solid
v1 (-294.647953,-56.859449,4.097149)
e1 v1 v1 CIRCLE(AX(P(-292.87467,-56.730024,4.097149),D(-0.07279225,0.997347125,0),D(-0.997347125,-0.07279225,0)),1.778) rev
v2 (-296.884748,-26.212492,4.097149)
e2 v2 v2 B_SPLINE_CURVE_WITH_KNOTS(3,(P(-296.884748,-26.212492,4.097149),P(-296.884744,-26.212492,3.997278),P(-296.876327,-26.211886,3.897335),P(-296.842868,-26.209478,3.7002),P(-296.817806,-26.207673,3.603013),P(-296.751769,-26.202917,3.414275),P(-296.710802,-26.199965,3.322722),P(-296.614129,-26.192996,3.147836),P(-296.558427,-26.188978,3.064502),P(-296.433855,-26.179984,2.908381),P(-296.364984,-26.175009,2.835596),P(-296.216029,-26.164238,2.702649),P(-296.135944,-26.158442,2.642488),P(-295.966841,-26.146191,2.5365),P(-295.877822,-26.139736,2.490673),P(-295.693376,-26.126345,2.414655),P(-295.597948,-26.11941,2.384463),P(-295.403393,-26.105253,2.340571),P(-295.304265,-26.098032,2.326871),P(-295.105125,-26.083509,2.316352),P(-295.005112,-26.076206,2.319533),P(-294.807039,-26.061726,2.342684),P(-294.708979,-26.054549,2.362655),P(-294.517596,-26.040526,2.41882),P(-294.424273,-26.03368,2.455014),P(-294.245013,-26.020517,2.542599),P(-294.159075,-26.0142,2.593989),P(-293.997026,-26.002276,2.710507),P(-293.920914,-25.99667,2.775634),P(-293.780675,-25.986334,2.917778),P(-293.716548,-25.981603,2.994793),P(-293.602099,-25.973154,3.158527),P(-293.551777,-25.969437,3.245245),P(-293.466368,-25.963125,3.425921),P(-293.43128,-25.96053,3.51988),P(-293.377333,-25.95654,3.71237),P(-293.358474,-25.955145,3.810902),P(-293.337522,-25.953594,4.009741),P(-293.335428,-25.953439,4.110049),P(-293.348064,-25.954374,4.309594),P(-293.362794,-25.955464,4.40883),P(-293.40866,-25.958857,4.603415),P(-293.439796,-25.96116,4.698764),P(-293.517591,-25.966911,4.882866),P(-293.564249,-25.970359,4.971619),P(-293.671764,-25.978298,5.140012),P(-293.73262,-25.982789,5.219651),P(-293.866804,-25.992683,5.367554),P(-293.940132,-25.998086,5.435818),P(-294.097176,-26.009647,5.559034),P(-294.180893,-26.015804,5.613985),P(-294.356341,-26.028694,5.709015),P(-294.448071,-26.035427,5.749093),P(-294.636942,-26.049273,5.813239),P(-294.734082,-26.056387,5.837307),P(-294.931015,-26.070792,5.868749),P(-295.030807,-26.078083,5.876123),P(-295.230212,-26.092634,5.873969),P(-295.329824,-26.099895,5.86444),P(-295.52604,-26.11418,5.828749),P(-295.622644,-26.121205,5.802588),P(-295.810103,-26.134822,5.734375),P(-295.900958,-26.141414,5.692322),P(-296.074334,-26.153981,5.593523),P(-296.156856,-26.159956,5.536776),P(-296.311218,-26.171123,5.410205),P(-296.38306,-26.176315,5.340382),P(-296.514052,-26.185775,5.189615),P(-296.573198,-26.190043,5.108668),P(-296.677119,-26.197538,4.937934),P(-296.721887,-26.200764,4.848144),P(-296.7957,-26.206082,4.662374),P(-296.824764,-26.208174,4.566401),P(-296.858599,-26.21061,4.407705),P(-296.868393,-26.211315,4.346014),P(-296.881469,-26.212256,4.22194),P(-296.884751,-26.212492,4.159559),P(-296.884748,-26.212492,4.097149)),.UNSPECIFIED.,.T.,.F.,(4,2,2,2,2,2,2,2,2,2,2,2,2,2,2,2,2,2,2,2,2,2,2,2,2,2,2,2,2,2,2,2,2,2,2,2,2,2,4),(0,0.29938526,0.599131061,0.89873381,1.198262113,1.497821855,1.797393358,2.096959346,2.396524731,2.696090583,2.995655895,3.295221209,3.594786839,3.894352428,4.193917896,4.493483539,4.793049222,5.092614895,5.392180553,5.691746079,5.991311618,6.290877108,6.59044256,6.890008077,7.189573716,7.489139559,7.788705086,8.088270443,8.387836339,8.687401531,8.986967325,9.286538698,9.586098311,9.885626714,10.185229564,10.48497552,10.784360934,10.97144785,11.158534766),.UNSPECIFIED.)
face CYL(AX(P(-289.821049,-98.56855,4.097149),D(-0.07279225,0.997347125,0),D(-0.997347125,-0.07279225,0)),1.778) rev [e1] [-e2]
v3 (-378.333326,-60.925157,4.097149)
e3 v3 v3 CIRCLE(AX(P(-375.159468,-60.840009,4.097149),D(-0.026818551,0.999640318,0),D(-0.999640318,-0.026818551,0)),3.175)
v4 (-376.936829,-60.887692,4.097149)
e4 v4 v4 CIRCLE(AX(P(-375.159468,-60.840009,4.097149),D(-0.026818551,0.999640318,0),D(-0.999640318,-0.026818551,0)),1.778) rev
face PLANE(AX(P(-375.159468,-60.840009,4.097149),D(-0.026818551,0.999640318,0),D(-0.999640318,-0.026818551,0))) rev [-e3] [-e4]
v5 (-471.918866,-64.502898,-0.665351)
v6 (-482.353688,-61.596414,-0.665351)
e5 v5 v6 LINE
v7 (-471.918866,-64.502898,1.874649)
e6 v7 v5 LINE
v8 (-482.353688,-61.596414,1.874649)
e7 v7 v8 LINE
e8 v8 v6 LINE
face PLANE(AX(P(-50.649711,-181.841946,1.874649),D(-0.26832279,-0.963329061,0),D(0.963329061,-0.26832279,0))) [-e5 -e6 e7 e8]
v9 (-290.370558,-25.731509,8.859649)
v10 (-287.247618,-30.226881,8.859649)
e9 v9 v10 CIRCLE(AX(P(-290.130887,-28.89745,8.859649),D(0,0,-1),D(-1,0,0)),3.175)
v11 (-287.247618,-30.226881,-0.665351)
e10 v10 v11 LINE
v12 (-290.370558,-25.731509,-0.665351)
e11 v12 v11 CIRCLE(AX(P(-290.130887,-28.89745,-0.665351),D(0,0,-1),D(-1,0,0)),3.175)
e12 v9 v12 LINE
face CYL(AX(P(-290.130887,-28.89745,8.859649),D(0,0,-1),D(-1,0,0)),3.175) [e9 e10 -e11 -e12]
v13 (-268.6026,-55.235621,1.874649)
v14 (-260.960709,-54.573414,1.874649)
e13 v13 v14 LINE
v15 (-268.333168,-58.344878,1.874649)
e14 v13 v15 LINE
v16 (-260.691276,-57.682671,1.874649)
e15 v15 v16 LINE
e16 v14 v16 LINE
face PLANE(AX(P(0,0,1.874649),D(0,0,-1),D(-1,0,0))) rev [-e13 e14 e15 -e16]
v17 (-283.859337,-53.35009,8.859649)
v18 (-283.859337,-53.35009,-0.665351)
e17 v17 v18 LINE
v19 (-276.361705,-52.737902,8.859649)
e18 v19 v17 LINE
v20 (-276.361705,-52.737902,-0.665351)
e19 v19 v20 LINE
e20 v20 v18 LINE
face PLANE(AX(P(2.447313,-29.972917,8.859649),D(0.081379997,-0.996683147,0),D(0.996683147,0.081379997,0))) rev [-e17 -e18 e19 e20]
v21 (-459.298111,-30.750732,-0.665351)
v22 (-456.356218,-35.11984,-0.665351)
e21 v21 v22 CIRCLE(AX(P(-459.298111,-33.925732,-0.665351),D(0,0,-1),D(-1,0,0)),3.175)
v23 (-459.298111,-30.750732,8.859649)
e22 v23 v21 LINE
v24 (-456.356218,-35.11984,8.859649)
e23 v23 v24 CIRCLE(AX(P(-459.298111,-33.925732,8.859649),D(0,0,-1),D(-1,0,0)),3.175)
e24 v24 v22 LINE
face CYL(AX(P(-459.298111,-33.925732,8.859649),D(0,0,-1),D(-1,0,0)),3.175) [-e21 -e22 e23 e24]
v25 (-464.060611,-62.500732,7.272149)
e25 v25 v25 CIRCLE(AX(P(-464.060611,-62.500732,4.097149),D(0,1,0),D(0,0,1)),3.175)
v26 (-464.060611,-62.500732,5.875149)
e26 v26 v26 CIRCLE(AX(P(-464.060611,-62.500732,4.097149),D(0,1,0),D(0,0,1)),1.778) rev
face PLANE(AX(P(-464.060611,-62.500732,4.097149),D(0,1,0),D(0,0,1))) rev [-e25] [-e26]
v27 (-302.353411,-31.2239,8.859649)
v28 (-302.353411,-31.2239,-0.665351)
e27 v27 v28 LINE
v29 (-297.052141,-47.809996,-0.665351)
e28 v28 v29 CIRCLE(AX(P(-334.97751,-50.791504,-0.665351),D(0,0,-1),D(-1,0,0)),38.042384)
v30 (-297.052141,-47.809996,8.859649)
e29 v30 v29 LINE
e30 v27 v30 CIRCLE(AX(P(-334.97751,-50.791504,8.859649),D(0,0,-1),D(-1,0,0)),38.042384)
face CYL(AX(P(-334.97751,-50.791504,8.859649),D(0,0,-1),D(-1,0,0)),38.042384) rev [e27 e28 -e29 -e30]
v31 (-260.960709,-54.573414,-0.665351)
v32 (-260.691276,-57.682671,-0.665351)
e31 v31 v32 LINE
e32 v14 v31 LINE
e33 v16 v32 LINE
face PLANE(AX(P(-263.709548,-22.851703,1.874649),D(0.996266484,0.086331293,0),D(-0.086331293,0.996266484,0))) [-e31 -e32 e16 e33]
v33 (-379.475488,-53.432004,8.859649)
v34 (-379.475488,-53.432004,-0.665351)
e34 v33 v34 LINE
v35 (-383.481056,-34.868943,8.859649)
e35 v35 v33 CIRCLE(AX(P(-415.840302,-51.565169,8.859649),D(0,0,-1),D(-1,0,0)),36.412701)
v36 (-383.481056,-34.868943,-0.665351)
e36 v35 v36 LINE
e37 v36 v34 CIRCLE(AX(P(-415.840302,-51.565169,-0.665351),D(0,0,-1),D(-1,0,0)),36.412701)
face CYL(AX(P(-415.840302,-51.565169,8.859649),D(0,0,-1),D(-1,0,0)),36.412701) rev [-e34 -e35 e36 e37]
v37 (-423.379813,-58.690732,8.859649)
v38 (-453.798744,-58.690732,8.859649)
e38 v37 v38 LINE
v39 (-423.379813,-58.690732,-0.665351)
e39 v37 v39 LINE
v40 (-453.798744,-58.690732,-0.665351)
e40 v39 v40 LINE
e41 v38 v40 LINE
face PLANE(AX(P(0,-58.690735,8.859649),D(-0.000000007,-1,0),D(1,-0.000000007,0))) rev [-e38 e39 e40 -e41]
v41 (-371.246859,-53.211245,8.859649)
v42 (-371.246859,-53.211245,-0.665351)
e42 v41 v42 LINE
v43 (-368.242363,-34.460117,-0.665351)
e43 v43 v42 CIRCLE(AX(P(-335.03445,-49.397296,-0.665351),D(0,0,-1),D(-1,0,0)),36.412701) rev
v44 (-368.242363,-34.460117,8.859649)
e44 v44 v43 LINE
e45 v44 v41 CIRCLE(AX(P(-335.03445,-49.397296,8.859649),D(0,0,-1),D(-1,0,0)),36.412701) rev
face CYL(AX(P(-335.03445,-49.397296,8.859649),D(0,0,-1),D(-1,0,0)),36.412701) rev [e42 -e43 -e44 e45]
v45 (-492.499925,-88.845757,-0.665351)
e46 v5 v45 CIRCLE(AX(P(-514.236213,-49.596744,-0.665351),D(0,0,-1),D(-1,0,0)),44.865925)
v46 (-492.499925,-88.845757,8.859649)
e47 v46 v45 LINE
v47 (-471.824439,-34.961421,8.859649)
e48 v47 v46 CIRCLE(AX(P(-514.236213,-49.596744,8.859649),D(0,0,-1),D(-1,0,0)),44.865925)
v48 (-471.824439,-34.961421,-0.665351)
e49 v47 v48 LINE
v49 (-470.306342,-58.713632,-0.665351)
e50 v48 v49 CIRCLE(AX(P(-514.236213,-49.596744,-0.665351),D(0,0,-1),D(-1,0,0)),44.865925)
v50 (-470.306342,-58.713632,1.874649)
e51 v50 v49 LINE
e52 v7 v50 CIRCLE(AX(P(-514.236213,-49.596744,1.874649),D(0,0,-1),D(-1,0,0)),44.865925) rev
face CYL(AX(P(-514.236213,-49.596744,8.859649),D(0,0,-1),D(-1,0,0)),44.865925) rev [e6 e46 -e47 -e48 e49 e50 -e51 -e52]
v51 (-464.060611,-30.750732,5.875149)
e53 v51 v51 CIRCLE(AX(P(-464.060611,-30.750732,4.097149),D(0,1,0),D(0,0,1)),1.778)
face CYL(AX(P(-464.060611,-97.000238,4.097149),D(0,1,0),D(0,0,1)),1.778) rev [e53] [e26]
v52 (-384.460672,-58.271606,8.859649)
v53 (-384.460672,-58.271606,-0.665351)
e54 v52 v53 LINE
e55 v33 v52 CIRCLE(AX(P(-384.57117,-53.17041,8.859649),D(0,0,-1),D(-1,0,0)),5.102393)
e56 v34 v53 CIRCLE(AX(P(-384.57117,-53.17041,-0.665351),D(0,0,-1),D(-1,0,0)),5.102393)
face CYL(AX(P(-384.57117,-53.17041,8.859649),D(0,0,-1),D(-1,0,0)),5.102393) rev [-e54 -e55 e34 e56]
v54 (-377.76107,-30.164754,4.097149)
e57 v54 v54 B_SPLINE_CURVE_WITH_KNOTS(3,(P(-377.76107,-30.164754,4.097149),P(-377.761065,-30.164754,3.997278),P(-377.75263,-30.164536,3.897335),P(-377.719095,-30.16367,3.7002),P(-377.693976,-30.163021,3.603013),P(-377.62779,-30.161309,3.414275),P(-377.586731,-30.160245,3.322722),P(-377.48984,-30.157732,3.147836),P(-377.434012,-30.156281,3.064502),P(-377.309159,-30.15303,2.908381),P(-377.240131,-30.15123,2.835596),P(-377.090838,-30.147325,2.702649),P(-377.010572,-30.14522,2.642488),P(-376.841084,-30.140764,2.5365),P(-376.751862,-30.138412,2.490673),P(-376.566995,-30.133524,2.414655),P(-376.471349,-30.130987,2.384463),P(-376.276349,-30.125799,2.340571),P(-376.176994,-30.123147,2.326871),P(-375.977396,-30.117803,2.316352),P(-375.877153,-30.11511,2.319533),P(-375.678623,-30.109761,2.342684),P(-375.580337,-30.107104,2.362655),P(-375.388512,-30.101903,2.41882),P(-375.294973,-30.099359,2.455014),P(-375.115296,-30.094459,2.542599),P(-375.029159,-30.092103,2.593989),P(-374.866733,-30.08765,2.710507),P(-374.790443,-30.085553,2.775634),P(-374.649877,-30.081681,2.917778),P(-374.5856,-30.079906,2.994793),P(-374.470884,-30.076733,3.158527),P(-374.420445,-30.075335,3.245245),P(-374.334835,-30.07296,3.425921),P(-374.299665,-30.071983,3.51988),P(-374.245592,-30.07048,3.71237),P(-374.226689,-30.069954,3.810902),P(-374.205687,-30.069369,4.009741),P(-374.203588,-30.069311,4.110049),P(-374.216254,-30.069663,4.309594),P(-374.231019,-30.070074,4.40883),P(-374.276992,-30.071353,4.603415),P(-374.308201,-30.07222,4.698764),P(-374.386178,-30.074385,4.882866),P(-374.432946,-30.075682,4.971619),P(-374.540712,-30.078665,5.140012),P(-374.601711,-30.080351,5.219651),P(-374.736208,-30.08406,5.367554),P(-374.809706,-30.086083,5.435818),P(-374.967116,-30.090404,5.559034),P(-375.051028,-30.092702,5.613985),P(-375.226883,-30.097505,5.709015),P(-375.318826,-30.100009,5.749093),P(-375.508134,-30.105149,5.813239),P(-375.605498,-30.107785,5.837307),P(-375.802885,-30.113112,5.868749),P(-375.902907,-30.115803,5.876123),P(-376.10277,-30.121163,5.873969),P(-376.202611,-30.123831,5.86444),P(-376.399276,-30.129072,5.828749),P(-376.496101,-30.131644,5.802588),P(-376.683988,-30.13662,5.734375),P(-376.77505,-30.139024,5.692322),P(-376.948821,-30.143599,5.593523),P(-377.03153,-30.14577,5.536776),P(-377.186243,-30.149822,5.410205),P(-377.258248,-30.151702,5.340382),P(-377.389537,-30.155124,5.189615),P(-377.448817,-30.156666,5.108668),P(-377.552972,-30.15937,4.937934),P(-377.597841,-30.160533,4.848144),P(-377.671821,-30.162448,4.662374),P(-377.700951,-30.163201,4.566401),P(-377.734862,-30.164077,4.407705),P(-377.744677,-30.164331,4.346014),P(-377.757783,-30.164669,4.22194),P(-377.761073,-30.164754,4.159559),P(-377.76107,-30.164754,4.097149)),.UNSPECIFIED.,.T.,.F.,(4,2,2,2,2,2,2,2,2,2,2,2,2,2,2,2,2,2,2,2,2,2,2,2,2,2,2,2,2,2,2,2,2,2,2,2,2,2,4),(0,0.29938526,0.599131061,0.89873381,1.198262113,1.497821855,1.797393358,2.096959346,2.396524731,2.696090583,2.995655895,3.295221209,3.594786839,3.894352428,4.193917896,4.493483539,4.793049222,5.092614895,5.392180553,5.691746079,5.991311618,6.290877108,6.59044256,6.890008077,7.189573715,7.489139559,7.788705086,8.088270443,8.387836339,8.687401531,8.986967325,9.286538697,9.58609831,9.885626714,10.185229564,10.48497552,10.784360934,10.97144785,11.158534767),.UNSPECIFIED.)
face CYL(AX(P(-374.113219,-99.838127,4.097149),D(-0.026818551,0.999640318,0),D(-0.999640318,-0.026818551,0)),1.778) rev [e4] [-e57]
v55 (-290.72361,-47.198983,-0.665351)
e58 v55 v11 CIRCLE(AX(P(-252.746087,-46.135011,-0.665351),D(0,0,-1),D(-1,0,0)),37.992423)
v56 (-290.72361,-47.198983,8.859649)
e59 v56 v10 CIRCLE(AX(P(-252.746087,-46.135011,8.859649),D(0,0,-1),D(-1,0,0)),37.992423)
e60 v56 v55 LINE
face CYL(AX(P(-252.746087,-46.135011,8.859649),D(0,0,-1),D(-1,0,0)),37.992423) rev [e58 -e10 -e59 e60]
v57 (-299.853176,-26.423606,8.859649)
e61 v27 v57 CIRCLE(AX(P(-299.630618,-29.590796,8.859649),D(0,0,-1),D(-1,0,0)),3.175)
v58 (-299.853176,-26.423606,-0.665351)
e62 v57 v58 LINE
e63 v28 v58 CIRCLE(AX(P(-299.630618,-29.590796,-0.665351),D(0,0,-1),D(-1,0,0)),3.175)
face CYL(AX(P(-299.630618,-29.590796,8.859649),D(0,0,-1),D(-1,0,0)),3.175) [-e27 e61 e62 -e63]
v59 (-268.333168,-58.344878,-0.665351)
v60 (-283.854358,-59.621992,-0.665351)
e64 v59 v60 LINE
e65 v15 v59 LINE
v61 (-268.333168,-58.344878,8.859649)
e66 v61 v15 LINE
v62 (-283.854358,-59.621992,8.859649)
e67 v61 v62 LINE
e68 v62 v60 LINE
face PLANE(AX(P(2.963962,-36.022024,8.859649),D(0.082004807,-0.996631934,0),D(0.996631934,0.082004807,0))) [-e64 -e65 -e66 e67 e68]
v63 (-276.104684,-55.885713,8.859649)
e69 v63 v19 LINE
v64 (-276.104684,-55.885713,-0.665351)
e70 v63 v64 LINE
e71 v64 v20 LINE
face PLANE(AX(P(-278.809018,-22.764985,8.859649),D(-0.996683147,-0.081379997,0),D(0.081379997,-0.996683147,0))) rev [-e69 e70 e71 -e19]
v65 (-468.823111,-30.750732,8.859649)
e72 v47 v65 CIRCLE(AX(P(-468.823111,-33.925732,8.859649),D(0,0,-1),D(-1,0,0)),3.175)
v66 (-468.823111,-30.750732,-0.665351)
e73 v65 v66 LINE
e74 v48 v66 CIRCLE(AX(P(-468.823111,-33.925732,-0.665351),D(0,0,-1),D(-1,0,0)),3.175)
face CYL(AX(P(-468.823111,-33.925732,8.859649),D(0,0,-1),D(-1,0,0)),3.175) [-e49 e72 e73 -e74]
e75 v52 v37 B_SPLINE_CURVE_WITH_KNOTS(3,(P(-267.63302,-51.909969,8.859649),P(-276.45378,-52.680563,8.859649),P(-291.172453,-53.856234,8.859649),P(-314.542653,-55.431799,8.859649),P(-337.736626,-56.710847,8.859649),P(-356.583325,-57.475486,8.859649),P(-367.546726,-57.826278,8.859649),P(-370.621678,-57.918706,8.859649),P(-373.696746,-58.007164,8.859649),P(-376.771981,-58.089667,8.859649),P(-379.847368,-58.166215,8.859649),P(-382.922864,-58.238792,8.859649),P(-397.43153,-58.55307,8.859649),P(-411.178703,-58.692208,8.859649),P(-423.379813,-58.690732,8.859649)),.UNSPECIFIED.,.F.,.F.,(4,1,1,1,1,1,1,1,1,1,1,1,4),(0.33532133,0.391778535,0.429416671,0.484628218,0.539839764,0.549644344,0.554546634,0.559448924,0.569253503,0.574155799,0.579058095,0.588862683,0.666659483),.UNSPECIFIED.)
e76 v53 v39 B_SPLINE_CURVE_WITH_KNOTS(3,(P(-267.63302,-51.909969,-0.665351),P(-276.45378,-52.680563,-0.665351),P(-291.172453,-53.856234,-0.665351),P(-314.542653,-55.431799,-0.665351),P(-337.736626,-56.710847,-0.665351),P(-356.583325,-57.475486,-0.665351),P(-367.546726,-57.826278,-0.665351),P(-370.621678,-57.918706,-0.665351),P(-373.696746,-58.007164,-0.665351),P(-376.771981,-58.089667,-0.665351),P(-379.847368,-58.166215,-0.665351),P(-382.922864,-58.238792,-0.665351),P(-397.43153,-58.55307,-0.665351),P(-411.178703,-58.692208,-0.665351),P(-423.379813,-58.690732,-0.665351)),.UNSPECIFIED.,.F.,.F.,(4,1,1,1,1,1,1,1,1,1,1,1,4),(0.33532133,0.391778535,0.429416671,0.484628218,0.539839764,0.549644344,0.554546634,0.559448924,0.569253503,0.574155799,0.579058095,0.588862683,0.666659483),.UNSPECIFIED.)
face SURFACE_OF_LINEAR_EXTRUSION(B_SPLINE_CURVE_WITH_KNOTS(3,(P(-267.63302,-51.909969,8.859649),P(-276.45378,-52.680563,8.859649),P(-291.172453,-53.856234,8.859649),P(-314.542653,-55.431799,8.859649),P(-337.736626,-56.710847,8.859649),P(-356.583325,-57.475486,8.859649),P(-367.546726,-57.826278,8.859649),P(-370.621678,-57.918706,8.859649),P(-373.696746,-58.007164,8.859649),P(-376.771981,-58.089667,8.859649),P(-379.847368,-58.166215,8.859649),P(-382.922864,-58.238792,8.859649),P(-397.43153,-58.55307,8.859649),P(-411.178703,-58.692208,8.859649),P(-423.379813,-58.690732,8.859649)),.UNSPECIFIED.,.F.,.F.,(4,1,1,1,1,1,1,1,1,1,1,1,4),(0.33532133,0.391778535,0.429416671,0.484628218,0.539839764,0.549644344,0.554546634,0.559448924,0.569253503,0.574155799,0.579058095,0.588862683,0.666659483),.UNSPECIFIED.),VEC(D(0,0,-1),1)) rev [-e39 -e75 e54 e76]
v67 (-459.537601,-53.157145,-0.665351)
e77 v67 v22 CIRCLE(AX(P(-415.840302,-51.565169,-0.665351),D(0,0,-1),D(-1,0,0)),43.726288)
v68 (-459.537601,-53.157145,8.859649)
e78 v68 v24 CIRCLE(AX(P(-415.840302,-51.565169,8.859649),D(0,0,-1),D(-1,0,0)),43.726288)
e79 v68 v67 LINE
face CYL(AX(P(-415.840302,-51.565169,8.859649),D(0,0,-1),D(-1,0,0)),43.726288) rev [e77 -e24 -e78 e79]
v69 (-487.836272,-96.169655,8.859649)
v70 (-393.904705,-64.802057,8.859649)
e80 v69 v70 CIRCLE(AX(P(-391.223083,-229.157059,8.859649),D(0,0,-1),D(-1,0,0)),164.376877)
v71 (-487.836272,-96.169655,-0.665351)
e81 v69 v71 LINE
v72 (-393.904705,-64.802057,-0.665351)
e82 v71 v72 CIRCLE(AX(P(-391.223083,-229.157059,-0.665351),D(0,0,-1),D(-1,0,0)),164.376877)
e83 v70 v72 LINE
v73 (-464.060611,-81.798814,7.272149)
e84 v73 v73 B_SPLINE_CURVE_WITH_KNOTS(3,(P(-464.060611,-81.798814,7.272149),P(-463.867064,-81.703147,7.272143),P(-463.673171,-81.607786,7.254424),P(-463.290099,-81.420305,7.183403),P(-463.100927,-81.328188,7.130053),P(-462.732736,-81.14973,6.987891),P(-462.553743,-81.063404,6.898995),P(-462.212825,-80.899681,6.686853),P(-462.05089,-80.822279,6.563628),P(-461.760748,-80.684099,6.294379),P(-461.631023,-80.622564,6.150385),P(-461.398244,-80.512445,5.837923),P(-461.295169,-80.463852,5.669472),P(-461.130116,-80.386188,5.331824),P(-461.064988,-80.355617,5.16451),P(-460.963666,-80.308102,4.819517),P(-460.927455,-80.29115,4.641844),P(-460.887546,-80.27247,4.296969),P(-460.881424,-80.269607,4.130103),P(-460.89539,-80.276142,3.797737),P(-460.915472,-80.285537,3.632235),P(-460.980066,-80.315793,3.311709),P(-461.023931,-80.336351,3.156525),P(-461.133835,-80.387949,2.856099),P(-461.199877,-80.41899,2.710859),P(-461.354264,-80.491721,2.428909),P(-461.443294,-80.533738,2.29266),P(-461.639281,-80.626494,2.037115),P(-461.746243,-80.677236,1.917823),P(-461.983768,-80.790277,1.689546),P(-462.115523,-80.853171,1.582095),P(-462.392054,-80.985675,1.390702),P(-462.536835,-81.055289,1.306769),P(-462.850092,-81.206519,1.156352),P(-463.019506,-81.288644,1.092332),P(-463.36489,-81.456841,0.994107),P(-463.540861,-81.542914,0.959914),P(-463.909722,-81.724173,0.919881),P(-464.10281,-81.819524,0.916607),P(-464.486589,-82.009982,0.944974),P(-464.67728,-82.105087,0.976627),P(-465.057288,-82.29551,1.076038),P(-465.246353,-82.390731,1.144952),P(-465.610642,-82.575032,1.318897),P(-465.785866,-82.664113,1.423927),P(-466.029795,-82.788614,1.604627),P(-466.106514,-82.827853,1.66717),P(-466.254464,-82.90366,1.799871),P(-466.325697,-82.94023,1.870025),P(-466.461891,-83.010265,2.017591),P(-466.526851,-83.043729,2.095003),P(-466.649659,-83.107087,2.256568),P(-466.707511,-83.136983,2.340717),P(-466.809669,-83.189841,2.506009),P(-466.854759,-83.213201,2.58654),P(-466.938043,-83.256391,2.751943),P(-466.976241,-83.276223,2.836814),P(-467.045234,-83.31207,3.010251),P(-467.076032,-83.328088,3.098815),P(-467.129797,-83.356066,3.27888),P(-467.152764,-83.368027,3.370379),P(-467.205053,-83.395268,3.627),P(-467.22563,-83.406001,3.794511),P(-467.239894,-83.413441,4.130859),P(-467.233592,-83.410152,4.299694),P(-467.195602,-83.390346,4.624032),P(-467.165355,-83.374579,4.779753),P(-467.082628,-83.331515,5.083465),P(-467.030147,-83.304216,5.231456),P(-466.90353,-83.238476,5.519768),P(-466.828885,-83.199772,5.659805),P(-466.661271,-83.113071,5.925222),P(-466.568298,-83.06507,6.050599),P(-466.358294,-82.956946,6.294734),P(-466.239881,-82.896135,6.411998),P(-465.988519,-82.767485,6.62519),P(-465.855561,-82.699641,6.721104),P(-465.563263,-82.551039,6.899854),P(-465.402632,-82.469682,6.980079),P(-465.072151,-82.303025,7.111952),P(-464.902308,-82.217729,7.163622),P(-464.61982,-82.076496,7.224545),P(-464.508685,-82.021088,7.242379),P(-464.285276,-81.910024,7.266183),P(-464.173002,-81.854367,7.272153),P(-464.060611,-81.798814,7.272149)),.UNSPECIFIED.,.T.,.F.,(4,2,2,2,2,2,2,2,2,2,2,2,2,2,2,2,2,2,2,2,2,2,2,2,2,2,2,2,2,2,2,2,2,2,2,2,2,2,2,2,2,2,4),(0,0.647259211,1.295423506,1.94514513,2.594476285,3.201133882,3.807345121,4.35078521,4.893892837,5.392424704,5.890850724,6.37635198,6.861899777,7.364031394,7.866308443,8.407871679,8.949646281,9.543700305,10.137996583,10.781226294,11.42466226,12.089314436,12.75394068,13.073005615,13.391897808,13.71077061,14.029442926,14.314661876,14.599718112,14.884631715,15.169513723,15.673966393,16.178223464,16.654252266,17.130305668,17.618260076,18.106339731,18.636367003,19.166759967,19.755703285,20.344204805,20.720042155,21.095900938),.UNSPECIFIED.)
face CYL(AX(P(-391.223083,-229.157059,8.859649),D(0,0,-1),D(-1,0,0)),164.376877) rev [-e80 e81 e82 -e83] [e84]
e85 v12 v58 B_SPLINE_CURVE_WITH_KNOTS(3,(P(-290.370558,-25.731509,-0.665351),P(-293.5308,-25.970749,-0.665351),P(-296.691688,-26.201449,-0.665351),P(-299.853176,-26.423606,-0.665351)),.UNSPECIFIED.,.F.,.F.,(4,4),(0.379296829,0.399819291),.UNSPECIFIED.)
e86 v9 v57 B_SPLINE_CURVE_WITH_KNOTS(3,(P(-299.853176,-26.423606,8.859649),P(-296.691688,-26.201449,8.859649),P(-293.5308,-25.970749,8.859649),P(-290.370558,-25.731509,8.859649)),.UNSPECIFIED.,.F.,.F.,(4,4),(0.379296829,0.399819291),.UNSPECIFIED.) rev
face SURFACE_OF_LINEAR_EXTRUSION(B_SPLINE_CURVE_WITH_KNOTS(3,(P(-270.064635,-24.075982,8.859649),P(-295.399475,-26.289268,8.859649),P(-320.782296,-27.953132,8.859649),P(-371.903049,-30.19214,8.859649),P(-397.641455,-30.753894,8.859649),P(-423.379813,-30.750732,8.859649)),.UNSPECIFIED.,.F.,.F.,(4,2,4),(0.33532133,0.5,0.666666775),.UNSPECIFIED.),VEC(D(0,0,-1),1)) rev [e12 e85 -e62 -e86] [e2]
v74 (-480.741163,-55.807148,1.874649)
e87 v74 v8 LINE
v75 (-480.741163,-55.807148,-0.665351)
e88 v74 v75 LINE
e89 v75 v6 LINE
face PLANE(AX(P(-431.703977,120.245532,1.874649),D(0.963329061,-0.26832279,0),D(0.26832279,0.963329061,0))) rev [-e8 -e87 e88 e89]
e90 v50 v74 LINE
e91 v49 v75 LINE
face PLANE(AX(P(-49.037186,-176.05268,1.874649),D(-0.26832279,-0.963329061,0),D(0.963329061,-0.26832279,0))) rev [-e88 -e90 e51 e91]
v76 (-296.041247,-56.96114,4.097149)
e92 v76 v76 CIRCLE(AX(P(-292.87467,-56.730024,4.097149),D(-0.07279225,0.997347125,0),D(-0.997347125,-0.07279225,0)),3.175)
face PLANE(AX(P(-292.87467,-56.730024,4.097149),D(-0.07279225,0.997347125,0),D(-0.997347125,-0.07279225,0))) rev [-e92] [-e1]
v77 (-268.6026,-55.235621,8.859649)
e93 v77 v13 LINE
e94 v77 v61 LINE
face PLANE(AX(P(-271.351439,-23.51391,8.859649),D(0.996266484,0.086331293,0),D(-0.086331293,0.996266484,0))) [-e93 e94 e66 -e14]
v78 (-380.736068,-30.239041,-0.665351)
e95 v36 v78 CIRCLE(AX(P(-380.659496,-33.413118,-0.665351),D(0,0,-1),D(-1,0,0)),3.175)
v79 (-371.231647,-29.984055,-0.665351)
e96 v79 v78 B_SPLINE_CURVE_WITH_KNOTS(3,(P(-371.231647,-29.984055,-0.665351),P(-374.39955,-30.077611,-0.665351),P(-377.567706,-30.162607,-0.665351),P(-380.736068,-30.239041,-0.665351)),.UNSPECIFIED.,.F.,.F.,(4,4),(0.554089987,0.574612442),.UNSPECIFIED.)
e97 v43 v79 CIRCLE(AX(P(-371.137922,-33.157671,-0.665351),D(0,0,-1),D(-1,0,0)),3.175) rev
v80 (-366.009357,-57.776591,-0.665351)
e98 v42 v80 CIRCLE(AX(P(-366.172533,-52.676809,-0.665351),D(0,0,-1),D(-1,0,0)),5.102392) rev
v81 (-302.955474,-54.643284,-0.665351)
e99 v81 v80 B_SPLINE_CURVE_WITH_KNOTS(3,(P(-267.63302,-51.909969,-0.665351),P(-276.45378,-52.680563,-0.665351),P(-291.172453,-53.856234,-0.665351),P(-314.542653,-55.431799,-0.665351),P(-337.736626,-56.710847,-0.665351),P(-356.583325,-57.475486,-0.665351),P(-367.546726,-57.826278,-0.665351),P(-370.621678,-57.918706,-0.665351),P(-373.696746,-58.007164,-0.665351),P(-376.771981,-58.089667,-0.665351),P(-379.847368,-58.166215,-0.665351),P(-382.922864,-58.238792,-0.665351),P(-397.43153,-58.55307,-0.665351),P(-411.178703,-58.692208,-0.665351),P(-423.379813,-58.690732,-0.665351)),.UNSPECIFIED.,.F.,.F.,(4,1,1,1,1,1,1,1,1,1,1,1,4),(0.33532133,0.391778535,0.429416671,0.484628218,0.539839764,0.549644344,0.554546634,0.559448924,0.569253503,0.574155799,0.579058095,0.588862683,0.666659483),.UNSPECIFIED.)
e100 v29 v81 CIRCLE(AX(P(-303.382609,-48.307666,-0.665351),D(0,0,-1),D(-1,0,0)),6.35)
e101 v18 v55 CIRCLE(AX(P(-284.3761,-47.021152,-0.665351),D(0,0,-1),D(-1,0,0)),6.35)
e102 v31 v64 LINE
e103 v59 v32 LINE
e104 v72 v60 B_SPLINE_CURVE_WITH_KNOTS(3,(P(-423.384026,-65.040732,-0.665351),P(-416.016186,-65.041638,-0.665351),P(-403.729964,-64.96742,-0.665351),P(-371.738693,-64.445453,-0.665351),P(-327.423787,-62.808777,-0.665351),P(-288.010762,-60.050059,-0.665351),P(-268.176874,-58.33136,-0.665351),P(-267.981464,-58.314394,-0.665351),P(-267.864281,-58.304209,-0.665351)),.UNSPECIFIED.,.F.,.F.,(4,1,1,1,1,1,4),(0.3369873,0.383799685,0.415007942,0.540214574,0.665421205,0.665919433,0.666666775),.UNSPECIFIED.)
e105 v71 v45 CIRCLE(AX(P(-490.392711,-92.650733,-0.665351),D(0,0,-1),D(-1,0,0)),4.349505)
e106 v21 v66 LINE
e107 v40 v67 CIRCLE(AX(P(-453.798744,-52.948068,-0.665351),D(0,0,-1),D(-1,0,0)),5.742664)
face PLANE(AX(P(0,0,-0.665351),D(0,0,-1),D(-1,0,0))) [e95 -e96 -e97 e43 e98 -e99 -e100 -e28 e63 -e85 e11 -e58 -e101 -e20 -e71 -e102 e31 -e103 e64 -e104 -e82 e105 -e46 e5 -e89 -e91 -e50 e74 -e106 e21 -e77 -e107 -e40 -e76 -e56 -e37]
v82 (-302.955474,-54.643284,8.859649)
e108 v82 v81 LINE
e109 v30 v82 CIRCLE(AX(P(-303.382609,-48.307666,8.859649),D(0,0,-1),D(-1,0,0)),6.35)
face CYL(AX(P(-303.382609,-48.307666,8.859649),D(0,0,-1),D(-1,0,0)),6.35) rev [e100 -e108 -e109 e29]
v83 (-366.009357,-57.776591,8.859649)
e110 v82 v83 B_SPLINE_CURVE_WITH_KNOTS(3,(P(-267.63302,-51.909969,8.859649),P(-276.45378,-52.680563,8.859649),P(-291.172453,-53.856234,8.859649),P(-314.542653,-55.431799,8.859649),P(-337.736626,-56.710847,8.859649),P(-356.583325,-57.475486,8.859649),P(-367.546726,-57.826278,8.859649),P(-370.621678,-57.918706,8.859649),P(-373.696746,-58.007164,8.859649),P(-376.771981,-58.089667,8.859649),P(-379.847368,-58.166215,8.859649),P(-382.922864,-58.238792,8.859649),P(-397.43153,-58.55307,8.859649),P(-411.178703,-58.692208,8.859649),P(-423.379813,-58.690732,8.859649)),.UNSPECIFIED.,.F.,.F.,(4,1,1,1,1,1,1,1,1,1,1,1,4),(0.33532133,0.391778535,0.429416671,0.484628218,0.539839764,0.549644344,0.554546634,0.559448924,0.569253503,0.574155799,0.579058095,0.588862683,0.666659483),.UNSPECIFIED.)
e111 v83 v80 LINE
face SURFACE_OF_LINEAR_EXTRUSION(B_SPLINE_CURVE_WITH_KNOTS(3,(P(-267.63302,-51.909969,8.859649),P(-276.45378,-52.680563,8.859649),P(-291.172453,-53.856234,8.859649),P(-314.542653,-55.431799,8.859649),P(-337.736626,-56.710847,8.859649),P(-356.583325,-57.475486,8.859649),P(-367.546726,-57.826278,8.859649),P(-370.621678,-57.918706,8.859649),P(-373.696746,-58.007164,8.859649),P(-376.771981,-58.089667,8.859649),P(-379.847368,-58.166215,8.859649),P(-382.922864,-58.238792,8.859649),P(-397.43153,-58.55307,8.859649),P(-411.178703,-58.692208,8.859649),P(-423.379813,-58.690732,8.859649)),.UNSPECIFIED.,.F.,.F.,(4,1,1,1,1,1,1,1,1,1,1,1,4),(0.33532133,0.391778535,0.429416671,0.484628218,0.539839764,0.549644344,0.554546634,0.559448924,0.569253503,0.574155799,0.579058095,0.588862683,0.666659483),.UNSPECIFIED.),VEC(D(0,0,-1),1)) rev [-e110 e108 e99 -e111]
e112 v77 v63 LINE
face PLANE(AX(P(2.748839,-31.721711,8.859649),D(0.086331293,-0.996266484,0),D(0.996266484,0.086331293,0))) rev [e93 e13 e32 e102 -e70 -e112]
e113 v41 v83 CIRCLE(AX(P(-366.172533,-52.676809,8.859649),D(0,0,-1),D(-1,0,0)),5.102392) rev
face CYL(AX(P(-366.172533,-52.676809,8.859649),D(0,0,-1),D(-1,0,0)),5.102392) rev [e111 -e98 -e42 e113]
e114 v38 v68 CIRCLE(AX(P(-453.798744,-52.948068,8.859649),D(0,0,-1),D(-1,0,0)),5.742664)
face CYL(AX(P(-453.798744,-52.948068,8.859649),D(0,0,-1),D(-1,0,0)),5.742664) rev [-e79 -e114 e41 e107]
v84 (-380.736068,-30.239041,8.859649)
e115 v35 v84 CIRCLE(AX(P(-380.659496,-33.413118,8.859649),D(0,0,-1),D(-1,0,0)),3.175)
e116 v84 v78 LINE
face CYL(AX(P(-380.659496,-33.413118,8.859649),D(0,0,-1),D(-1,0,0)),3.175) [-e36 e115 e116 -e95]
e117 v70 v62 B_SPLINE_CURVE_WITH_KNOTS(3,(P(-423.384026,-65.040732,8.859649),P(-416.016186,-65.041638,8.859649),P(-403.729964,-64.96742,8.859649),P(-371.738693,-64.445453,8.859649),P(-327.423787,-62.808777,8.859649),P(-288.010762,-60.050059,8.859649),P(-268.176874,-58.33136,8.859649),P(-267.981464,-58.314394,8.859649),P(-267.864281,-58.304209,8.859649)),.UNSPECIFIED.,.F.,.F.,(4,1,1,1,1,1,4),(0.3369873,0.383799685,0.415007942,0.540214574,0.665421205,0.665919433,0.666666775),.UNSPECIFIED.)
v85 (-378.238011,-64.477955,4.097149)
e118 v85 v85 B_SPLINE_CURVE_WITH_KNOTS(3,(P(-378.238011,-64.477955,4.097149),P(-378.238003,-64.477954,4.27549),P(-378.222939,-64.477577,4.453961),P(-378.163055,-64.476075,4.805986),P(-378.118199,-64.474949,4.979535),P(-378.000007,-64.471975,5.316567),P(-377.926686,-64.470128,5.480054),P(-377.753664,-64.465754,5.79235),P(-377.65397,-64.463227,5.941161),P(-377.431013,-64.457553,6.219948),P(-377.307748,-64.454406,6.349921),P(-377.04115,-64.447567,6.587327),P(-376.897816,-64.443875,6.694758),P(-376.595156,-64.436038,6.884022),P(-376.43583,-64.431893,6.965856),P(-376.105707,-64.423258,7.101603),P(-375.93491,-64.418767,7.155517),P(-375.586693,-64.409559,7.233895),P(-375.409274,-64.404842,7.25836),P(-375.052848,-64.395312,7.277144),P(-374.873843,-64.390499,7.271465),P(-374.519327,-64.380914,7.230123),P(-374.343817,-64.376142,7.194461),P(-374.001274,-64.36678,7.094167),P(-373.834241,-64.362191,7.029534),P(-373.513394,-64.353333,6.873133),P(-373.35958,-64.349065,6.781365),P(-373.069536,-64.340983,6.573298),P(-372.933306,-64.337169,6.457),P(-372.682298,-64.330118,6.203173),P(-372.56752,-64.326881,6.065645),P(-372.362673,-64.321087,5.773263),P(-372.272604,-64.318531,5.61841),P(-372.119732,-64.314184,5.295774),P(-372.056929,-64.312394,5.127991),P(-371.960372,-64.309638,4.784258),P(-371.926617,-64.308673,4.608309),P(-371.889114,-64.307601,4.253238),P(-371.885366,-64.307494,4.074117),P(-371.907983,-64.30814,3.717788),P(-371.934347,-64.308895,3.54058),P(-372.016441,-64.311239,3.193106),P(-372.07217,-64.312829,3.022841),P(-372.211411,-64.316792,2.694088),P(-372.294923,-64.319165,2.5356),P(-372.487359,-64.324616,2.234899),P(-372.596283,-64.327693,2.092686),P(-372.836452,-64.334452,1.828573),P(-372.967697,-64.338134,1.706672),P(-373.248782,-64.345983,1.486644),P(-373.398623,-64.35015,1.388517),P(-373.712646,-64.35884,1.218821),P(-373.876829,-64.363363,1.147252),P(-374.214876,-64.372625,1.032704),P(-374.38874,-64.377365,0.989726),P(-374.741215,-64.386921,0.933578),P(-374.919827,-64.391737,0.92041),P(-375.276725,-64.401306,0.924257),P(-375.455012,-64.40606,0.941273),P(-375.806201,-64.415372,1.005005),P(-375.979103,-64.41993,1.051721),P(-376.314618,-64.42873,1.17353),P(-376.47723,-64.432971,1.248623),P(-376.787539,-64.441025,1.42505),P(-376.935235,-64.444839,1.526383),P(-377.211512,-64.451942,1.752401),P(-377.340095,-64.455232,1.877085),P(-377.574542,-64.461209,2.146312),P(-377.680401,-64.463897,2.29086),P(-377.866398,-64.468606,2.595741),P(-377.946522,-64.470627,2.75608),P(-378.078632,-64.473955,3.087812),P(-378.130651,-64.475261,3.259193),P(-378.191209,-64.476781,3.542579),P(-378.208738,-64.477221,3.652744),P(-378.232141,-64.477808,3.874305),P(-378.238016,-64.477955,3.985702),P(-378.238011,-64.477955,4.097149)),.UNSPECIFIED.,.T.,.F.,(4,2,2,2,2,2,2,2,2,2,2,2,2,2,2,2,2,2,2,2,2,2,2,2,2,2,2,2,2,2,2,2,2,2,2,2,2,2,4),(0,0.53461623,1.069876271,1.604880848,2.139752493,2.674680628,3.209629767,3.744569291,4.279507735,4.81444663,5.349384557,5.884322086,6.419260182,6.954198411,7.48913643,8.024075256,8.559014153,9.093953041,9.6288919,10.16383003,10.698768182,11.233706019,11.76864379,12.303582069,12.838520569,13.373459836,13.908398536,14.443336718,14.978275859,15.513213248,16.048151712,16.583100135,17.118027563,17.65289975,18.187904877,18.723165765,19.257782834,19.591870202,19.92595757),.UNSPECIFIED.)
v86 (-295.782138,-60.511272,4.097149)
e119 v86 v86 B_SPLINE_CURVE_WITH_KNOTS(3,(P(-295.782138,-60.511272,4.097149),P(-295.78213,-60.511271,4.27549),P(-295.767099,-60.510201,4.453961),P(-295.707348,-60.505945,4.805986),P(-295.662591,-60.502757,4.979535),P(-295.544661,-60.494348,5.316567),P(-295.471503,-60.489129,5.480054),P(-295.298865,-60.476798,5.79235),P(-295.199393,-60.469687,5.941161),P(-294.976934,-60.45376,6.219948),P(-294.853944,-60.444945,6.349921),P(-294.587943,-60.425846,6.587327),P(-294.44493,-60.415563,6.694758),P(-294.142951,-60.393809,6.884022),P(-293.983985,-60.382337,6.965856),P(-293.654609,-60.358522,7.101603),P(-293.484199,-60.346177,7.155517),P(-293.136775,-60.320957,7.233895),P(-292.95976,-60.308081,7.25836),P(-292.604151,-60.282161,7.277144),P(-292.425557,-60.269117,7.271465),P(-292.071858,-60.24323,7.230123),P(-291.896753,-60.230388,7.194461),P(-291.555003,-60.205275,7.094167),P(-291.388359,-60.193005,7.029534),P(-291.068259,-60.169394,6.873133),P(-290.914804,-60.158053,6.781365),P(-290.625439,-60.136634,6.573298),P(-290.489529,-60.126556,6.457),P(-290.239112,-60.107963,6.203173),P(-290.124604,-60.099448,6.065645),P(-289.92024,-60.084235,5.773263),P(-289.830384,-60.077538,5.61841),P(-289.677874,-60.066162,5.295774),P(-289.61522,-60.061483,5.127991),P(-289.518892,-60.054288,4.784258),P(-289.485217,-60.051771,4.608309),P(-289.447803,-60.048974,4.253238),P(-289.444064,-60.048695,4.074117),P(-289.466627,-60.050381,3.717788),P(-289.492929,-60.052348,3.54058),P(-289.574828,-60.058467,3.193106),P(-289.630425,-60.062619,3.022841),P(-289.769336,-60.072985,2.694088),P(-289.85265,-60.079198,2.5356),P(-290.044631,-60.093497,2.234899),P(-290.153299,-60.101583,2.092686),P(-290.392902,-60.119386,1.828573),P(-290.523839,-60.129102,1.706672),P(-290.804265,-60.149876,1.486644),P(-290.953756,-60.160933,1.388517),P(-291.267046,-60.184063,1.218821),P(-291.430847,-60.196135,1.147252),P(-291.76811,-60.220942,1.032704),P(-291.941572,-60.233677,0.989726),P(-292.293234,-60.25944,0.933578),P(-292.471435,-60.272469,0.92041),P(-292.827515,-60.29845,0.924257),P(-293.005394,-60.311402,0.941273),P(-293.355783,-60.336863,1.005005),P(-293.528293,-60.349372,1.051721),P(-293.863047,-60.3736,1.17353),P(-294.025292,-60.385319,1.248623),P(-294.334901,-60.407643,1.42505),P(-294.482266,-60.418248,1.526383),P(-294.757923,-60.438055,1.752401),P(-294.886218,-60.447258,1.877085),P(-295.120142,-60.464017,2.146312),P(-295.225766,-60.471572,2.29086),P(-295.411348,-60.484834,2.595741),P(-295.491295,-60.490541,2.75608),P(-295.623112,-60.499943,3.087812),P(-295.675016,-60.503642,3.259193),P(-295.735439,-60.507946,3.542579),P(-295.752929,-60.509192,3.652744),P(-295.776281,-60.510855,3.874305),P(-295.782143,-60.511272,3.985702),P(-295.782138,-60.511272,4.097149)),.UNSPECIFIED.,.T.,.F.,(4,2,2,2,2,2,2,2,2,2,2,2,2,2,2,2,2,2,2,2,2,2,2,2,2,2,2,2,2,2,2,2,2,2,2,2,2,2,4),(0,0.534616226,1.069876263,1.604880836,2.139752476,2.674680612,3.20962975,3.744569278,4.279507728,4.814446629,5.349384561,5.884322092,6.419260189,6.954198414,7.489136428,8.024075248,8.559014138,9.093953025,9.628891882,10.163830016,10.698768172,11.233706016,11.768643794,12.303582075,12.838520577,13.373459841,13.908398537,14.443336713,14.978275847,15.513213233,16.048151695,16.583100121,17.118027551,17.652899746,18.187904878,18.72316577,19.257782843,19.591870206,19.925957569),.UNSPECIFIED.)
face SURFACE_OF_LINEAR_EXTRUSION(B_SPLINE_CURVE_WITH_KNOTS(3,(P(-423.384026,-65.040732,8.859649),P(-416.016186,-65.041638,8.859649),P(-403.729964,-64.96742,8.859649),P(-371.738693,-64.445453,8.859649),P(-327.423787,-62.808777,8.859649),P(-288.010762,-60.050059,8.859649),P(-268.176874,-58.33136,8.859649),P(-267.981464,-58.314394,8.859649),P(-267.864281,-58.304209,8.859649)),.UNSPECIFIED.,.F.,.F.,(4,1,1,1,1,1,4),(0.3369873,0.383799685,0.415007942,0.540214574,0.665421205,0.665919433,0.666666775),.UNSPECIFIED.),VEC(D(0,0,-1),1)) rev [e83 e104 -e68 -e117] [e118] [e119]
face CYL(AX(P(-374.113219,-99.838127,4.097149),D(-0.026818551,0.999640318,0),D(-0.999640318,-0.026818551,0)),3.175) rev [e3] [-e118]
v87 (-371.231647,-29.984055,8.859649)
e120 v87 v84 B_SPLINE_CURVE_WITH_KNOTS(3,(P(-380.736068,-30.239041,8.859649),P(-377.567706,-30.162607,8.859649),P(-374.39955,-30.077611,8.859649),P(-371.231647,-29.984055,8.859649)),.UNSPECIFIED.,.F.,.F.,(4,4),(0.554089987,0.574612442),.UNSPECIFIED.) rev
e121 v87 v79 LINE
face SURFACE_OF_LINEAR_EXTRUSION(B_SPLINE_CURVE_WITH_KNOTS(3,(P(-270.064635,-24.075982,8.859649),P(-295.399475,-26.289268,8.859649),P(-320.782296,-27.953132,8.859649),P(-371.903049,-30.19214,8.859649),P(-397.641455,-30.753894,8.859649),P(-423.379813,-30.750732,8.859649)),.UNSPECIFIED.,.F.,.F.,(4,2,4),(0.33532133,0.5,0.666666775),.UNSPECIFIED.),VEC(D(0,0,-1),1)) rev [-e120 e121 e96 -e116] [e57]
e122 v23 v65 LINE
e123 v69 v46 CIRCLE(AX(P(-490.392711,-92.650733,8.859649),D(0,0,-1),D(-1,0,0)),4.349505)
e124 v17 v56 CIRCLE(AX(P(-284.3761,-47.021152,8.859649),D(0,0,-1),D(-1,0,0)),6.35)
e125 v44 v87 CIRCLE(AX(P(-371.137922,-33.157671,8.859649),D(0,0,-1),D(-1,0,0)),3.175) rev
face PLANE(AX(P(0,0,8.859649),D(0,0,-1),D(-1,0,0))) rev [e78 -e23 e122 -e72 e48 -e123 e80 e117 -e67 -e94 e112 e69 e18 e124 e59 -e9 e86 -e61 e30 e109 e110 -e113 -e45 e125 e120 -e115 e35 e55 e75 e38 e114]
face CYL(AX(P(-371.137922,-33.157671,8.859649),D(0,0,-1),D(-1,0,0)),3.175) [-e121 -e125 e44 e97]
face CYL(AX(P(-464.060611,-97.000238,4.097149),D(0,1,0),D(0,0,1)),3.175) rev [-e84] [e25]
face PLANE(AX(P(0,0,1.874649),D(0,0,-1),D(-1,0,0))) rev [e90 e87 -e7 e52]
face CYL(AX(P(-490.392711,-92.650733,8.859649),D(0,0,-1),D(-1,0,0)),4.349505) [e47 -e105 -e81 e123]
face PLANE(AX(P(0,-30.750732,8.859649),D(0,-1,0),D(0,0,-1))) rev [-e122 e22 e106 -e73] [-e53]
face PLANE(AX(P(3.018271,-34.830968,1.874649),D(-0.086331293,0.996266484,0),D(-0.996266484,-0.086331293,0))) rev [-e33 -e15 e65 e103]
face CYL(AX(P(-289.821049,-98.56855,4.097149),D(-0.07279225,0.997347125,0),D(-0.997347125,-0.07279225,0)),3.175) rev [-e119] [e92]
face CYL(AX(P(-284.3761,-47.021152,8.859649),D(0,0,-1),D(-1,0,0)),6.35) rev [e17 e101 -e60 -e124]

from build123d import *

# Parameters (mm, degrees)
BOSS_EXTRUDE5_START      = -4.7625
BOSS_EXTRUDE5_DEPTH      = 9.525
SKETCH6_R                = 1.778
CUT_EXTRUDE3_DEPTH       = 504.714306696
SKETCH10_R               = 1.778
CUT_EXTRUDE6_DEPTH       = 502.305599176
CUT_EXTRUDE11_DEPTH      = 3.556
CUT_EXTRUDE11_DEPTH_BACK = 499.112065171
SKETCH12_R               = 3.175
SKETCH13_R               = 1.778
CUT_EXTRUDE12_DEPTH      = 500.23676844
CUT_EXTRUDE13_DEPTH      = 6.35
CUT_EXTRUDE13_DEPTH_BACK = 497.697496023
SKETCH14_R               = 3.175
CUT_EXTRUDE14_DEPTH      = 3.556
CUT_EXTRUDE14_DEPTH_BACK = 502.048406711
SKETCH16_R               = 3.175
BOSS_EXTRUDE8_START      = -2.54
BOSS_EXTRUDE8_DEPTH      = 2.54


# Read off the part's stored shape, not the designer's step: Boss-Extrude5
with BuildPart() as part:
    # Boss-Extrude5 outline → Boss-Extrude5 (new body)
    with BuildSketch(Plane(origin=(0, 0, 4.097149242), x_dir=(-1, 0, 0), z_dir=(0, 0, -1)).offset(BOSS_EXTRUDE5_START)):
        with BuildLine():
            add(Edge.make_bspline(
                [(393.904705106, -64.802061588), (391.448326364, -64.761983229), (369.283277897, -64.354767178), (332.573121161, -62.998956248), (298.370755587, -60.752959194), (283.854357877, -59.621991507)],
                knots=[0.399403863, 0.399403863, 0.399403863, 0.399403863, 0.415007942, 0.540214574, 0.632697153, 0.632697153, 0.632697153, 0.632697153], degree=3))
            ThreePointArc((393.904705106, -64.802061588), (443.288872323, -73.243905657), (487.836271638, -96.169655094))
            ThreePointArc((487.836271638, -96.169655094), (494.061542174, -94.986942251), (492.499924864, -88.845757162))
            ThreePointArc((492.499924864, -88.845757162), (472.347982204, -65.669309605), (471.824439099, -34.961421092))
            ThreePointArc((471.824439099, -34.961421092), (471.408544547, -32.082865726), (468.823110549, -30.750731982))
            Line((468.823110549, -30.750731982), (459.298110549, -30.750731982))
            ThreePointArc((459.298110549, -30.750731982), (456.664489609, -32.15241144), (456.356218194, -35.119840174))
            ThreePointArc((456.356218194, -35.119840174), (458.901914687, -43.970050893), (459.537600747, -53.157145299))
            ThreePointArc((459.537600747, -53.157145299), (457.784815205, -57.082003794), (453.798743833, -58.690731982))
            Line((453.798743833, -58.690731982), (423.379813152, -58.69073219))
            add(Edge.make_bspline(
                [(384.460672275, -58.271606449), (385.229576489, -58.288261834), (398.200840977, -58.560856767), (411.17870293, -58.692207634), (423.379813152, -58.69073219)],
                knots=[0.583960389, 0.583960389, 0.583960389, 0.583960389, 0.588862683, 0.666659483, 0.666659483, 0.666659483, 0.666659483], degree=3))
            ThreePointArc((384.460672275, -58.271606449), (381.017085608, -56.831406643), (379.475487665, -53.432003695))
            ThreePointArc((379.475487665, -53.432003695), (380.246820348, -43.884748581), (383.481055682, -34.868942675))
            ThreePointArc((383.481055682, -34.868942675), (383.390574332, -31.793909155), (380.736068027, -30.23904122))
            add(Edge.make_bspline(
                [(371.231646974, -29.984054972), (374.399550345, -30.077611409), (377.567706075, -30.162607104), (380.736068027, -30.23904122)],
                knots=[0.554089987, 0.554089987, 0.554089987, 0.554089987, 0.574612442, 0.574612442, 0.574612442, 0.574612442], degree=3))
            ThreePointArc((371.231646974, -29.984054972), (368.497590279, -31.394357567), (368.242362728, -34.460116711))
            ThreePointArc((368.242362728, -34.460116711), (370.988538335, -43.636366014), (371.246859304, -53.211244668))
            ThreePointArc((371.246859304, -53.211244668), (369.525210394, -56.523100632), (366.009356719, -57.776590868))
            add(Edge.make_bspline(
                [(302.95547422, -54.643284316), (305.9011715, -54.841877501), (317.490683468, -55.594370094), (337.736625716, -56.710847247), (355.814849648, -57.444307809), (365.24066472, -57.751995195), (366.009356719, -57.776590868)],
                knots=[0.410597603, 0.410597603, 0.410597603, 0.410597603, 0.429416671, 0.484628218, 0.539839764, 0.544742054, 0.544742054, 0.544742054, 0.544742054], degree=3))
            ThreePointArc((302.95547422, -54.643284316), (298.577428951, -52.458900104), (297.052141363, -47.809995658))
            ThreePointArc((297.052141363, -47.809995658), (298.741043629, -39.209557534), (302.353410859, -31.223899778))
            ThreePointArc((302.353410859, -31.223899778), (302.446551024, -28.124116994), (299.853176371, -26.423606391))
            add(Edge.make_bspline(
                [(290.370558291, -25.731509235), (293.530799834, -25.970748987), (296.691687874, -26.201449108), (299.853176371, -26.423606391)],
                knots=[0.379296829, 0.379296829, 0.379296829, 0.379296829, 0.399819291, 0.399819291, 0.399819291, 0.399819291], degree=3))
            ThreePointArc((290.370558291, -25.731509235), (287.523350949, -27.0859922), (287.247618484, -30.226881462))
            ThreePointArc((287.247618484, -30.226881462), (289.965925573, -38.51215819), (290.723609817, -47.198982609))
            ThreePointArc((290.723609817, -47.198982609), (288.61383932, -51.750218303), (283.859337385, -53.350089939))
            Line((283.859337385, -53.350089939), (276.361704846, -52.737902091))
            Line((276.361704846, -52.737902091), (276.104683524, -55.885712738))
            Line((276.104683524, -55.885712738), (268.602599978, -55.235621039))
            Line((268.602599978, -55.235621039), (268.333167883, -58.344877914))
            Line((268.333167883, -58.344877914), (283.854357877, -59.621991507))
        make_face()
    extrude(amount=BOSS_EXTRUDE5_DEPTH)

    # Sketch6 → Cut-Extrude3 (cut, through all)
    with BuildSketch(Plane(origin=(0.329495605, -4.514512092, 0), x_dir=(0.9973471252705134, 0.07279225037490757, 0), z_dir=(-0.07279225037490757, 0.9973471252705134, 0))):
        with Locations(Location((-296.227216633, -4.097149242, 0), (0, 0, 180))):
            Circle(SKETCH6_R)
    extrude(amount=-CUT_EXTRUDE3_DEPTH, mode=Mode.SUBTRACT)

    # Sketch10 → Cut-Extrude6 (cut, through all)
    with BuildSketch(Plane(origin=(0.536837, -20.010175041, 0), x_dir=(0.9996403179621594, 0.026818551499160636, 0), z_dir=(-0.026818551499160636, 0.9996403179621594, 0))):
        with Locations(Location((-376.656170964, -4.097149242, 0), (0, 0, 180))):
            Circle(SKETCH10_R)
    extrude(amount=-CUT_EXTRUDE6_DEPTH, mode=Mode.SUBTRACT)

    # Sketch12 → Cut-Extrude11 (cut, two sides: drawn at the far end of the back side and taken through both)
    with BuildSketch(Plane(origin=(1.456593089, -54.293356553, 0), x_dir=(0.9996403179621594, 0.026818551499160636, 0), z_dir=(-0.026818551499160636, 0.9996403179621594, 0)).offset(-CUT_EXTRUDE11_DEPTH_BACK)):
        with Locations(Location((-376.656171029, -4.097149242, 0), (0, 0, 180))):
            Circle(SKETCH12_R)
    extrude(amount=CUT_EXTRUDE11_DEPTH + CUT_EXTRUDE11_DEPTH_BACK, mode=Mode.SUBTRACT)

    # Sketch13 → Cut-Extrude12 (cut, through all)
    with BuildSketch(Plane(origin=(0, -30.750731982, 0), x_dir=(1, 0, 0), z_dir=(0, 1, 0))):
        with Locations(Location((-464.060610549, -4.097149242, 0), (0, 0, 270))):
            Circle(SKETCH13_R)
    extrude(amount=-CUT_EXTRUDE12_DEPTH, mode=Mode.SUBTRACT)

    # Sketch14 → Cut-Extrude13 (cut, two sides: drawn at the far end of the back side and taken through both)
    with BuildSketch(Plane(origin=(0, -68.850731982, 0), x_dir=(1, 0, 0), z_dir=(0, 1, 0)).offset(-CUT_EXTRUDE13_DEPTH_BACK)):
        with Locations(Location((-464.060610549, -4.097149242, 0), (0, 0, 270))):
            Circle(SKETCH14_R)
    extrude(amount=CUT_EXTRUDE13_DEPTH + CUT_EXTRUDE13_DEPTH_BACK, mode=Mode.SUBTRACT)

    # Sketch16 → Cut-Extrude14 (cut, two sides: drawn at the far end of the back side and taken through both)
    with BuildSketch(Plane(origin=(2.82554187, -38.713545018, 0), x_dir=(0.9973471252705134, 0.07279225037490757, 0), z_dir=(-0.07279225037490757, 0.9973471252705134, 0)).offset(-CUT_EXTRUDE14_DEPTH_BACK)):
        with Locations(Location((-296.227216633, -4.097149242, 0), (0, 0, 180))):
            Circle(SKETCH16_R)
    extrude(amount=CUT_EXTRUDE14_DEPTH + CUT_EXTRUDE14_DEPTH_BACK, mode=Mode.SUBTRACT)

    # Sketch17 → Boss-Extrude8 (add)
    with BuildSketch(Plane(origin=(0, 0, -0.665350758), x_dir=(-1, 0, 0), z_dir=(0, 0, -1)).offset(BOSS_EXTRUDE8_START)):
        Polygon((480.741163163, -55.807148253), (482.353687842, -61.5964138), (471.918866371, -64.502897707), (470.306341692, -58.71363216), align=None)
        Polygon((268.602599978, -55.235621039), (260.960708561, -54.573414315), (260.691276466, -57.68267119), (268.333167883, -58.344877914), align=None)
        with BuildLine():
            ThreePointArc((471.918866371, -64.502897707), (471.01556343, -61.635294332), (470.306341692, -58.71363216))
            Line((470.306341692, -58.71363216), (468.875088895, -59.112289025))
            Line((468.875088895, -59.112289025), (470.487613574, -64.901554572))
            Line((470.487613574, -64.901554572), (471.918866371, -64.502897707))
        make_face()
        with BuildLine():
            Line((471.918866371, -64.502897707), (470.306341692, -58.71363216))
            ThreePointArc((470.306341692, -58.71363216), (471.01556343, -61.635294332), (471.918866371, -64.502897707))
        make_face()
    extrude(amount=BOSS_EXTRUDE8_DEPTH)


solid = part.part
